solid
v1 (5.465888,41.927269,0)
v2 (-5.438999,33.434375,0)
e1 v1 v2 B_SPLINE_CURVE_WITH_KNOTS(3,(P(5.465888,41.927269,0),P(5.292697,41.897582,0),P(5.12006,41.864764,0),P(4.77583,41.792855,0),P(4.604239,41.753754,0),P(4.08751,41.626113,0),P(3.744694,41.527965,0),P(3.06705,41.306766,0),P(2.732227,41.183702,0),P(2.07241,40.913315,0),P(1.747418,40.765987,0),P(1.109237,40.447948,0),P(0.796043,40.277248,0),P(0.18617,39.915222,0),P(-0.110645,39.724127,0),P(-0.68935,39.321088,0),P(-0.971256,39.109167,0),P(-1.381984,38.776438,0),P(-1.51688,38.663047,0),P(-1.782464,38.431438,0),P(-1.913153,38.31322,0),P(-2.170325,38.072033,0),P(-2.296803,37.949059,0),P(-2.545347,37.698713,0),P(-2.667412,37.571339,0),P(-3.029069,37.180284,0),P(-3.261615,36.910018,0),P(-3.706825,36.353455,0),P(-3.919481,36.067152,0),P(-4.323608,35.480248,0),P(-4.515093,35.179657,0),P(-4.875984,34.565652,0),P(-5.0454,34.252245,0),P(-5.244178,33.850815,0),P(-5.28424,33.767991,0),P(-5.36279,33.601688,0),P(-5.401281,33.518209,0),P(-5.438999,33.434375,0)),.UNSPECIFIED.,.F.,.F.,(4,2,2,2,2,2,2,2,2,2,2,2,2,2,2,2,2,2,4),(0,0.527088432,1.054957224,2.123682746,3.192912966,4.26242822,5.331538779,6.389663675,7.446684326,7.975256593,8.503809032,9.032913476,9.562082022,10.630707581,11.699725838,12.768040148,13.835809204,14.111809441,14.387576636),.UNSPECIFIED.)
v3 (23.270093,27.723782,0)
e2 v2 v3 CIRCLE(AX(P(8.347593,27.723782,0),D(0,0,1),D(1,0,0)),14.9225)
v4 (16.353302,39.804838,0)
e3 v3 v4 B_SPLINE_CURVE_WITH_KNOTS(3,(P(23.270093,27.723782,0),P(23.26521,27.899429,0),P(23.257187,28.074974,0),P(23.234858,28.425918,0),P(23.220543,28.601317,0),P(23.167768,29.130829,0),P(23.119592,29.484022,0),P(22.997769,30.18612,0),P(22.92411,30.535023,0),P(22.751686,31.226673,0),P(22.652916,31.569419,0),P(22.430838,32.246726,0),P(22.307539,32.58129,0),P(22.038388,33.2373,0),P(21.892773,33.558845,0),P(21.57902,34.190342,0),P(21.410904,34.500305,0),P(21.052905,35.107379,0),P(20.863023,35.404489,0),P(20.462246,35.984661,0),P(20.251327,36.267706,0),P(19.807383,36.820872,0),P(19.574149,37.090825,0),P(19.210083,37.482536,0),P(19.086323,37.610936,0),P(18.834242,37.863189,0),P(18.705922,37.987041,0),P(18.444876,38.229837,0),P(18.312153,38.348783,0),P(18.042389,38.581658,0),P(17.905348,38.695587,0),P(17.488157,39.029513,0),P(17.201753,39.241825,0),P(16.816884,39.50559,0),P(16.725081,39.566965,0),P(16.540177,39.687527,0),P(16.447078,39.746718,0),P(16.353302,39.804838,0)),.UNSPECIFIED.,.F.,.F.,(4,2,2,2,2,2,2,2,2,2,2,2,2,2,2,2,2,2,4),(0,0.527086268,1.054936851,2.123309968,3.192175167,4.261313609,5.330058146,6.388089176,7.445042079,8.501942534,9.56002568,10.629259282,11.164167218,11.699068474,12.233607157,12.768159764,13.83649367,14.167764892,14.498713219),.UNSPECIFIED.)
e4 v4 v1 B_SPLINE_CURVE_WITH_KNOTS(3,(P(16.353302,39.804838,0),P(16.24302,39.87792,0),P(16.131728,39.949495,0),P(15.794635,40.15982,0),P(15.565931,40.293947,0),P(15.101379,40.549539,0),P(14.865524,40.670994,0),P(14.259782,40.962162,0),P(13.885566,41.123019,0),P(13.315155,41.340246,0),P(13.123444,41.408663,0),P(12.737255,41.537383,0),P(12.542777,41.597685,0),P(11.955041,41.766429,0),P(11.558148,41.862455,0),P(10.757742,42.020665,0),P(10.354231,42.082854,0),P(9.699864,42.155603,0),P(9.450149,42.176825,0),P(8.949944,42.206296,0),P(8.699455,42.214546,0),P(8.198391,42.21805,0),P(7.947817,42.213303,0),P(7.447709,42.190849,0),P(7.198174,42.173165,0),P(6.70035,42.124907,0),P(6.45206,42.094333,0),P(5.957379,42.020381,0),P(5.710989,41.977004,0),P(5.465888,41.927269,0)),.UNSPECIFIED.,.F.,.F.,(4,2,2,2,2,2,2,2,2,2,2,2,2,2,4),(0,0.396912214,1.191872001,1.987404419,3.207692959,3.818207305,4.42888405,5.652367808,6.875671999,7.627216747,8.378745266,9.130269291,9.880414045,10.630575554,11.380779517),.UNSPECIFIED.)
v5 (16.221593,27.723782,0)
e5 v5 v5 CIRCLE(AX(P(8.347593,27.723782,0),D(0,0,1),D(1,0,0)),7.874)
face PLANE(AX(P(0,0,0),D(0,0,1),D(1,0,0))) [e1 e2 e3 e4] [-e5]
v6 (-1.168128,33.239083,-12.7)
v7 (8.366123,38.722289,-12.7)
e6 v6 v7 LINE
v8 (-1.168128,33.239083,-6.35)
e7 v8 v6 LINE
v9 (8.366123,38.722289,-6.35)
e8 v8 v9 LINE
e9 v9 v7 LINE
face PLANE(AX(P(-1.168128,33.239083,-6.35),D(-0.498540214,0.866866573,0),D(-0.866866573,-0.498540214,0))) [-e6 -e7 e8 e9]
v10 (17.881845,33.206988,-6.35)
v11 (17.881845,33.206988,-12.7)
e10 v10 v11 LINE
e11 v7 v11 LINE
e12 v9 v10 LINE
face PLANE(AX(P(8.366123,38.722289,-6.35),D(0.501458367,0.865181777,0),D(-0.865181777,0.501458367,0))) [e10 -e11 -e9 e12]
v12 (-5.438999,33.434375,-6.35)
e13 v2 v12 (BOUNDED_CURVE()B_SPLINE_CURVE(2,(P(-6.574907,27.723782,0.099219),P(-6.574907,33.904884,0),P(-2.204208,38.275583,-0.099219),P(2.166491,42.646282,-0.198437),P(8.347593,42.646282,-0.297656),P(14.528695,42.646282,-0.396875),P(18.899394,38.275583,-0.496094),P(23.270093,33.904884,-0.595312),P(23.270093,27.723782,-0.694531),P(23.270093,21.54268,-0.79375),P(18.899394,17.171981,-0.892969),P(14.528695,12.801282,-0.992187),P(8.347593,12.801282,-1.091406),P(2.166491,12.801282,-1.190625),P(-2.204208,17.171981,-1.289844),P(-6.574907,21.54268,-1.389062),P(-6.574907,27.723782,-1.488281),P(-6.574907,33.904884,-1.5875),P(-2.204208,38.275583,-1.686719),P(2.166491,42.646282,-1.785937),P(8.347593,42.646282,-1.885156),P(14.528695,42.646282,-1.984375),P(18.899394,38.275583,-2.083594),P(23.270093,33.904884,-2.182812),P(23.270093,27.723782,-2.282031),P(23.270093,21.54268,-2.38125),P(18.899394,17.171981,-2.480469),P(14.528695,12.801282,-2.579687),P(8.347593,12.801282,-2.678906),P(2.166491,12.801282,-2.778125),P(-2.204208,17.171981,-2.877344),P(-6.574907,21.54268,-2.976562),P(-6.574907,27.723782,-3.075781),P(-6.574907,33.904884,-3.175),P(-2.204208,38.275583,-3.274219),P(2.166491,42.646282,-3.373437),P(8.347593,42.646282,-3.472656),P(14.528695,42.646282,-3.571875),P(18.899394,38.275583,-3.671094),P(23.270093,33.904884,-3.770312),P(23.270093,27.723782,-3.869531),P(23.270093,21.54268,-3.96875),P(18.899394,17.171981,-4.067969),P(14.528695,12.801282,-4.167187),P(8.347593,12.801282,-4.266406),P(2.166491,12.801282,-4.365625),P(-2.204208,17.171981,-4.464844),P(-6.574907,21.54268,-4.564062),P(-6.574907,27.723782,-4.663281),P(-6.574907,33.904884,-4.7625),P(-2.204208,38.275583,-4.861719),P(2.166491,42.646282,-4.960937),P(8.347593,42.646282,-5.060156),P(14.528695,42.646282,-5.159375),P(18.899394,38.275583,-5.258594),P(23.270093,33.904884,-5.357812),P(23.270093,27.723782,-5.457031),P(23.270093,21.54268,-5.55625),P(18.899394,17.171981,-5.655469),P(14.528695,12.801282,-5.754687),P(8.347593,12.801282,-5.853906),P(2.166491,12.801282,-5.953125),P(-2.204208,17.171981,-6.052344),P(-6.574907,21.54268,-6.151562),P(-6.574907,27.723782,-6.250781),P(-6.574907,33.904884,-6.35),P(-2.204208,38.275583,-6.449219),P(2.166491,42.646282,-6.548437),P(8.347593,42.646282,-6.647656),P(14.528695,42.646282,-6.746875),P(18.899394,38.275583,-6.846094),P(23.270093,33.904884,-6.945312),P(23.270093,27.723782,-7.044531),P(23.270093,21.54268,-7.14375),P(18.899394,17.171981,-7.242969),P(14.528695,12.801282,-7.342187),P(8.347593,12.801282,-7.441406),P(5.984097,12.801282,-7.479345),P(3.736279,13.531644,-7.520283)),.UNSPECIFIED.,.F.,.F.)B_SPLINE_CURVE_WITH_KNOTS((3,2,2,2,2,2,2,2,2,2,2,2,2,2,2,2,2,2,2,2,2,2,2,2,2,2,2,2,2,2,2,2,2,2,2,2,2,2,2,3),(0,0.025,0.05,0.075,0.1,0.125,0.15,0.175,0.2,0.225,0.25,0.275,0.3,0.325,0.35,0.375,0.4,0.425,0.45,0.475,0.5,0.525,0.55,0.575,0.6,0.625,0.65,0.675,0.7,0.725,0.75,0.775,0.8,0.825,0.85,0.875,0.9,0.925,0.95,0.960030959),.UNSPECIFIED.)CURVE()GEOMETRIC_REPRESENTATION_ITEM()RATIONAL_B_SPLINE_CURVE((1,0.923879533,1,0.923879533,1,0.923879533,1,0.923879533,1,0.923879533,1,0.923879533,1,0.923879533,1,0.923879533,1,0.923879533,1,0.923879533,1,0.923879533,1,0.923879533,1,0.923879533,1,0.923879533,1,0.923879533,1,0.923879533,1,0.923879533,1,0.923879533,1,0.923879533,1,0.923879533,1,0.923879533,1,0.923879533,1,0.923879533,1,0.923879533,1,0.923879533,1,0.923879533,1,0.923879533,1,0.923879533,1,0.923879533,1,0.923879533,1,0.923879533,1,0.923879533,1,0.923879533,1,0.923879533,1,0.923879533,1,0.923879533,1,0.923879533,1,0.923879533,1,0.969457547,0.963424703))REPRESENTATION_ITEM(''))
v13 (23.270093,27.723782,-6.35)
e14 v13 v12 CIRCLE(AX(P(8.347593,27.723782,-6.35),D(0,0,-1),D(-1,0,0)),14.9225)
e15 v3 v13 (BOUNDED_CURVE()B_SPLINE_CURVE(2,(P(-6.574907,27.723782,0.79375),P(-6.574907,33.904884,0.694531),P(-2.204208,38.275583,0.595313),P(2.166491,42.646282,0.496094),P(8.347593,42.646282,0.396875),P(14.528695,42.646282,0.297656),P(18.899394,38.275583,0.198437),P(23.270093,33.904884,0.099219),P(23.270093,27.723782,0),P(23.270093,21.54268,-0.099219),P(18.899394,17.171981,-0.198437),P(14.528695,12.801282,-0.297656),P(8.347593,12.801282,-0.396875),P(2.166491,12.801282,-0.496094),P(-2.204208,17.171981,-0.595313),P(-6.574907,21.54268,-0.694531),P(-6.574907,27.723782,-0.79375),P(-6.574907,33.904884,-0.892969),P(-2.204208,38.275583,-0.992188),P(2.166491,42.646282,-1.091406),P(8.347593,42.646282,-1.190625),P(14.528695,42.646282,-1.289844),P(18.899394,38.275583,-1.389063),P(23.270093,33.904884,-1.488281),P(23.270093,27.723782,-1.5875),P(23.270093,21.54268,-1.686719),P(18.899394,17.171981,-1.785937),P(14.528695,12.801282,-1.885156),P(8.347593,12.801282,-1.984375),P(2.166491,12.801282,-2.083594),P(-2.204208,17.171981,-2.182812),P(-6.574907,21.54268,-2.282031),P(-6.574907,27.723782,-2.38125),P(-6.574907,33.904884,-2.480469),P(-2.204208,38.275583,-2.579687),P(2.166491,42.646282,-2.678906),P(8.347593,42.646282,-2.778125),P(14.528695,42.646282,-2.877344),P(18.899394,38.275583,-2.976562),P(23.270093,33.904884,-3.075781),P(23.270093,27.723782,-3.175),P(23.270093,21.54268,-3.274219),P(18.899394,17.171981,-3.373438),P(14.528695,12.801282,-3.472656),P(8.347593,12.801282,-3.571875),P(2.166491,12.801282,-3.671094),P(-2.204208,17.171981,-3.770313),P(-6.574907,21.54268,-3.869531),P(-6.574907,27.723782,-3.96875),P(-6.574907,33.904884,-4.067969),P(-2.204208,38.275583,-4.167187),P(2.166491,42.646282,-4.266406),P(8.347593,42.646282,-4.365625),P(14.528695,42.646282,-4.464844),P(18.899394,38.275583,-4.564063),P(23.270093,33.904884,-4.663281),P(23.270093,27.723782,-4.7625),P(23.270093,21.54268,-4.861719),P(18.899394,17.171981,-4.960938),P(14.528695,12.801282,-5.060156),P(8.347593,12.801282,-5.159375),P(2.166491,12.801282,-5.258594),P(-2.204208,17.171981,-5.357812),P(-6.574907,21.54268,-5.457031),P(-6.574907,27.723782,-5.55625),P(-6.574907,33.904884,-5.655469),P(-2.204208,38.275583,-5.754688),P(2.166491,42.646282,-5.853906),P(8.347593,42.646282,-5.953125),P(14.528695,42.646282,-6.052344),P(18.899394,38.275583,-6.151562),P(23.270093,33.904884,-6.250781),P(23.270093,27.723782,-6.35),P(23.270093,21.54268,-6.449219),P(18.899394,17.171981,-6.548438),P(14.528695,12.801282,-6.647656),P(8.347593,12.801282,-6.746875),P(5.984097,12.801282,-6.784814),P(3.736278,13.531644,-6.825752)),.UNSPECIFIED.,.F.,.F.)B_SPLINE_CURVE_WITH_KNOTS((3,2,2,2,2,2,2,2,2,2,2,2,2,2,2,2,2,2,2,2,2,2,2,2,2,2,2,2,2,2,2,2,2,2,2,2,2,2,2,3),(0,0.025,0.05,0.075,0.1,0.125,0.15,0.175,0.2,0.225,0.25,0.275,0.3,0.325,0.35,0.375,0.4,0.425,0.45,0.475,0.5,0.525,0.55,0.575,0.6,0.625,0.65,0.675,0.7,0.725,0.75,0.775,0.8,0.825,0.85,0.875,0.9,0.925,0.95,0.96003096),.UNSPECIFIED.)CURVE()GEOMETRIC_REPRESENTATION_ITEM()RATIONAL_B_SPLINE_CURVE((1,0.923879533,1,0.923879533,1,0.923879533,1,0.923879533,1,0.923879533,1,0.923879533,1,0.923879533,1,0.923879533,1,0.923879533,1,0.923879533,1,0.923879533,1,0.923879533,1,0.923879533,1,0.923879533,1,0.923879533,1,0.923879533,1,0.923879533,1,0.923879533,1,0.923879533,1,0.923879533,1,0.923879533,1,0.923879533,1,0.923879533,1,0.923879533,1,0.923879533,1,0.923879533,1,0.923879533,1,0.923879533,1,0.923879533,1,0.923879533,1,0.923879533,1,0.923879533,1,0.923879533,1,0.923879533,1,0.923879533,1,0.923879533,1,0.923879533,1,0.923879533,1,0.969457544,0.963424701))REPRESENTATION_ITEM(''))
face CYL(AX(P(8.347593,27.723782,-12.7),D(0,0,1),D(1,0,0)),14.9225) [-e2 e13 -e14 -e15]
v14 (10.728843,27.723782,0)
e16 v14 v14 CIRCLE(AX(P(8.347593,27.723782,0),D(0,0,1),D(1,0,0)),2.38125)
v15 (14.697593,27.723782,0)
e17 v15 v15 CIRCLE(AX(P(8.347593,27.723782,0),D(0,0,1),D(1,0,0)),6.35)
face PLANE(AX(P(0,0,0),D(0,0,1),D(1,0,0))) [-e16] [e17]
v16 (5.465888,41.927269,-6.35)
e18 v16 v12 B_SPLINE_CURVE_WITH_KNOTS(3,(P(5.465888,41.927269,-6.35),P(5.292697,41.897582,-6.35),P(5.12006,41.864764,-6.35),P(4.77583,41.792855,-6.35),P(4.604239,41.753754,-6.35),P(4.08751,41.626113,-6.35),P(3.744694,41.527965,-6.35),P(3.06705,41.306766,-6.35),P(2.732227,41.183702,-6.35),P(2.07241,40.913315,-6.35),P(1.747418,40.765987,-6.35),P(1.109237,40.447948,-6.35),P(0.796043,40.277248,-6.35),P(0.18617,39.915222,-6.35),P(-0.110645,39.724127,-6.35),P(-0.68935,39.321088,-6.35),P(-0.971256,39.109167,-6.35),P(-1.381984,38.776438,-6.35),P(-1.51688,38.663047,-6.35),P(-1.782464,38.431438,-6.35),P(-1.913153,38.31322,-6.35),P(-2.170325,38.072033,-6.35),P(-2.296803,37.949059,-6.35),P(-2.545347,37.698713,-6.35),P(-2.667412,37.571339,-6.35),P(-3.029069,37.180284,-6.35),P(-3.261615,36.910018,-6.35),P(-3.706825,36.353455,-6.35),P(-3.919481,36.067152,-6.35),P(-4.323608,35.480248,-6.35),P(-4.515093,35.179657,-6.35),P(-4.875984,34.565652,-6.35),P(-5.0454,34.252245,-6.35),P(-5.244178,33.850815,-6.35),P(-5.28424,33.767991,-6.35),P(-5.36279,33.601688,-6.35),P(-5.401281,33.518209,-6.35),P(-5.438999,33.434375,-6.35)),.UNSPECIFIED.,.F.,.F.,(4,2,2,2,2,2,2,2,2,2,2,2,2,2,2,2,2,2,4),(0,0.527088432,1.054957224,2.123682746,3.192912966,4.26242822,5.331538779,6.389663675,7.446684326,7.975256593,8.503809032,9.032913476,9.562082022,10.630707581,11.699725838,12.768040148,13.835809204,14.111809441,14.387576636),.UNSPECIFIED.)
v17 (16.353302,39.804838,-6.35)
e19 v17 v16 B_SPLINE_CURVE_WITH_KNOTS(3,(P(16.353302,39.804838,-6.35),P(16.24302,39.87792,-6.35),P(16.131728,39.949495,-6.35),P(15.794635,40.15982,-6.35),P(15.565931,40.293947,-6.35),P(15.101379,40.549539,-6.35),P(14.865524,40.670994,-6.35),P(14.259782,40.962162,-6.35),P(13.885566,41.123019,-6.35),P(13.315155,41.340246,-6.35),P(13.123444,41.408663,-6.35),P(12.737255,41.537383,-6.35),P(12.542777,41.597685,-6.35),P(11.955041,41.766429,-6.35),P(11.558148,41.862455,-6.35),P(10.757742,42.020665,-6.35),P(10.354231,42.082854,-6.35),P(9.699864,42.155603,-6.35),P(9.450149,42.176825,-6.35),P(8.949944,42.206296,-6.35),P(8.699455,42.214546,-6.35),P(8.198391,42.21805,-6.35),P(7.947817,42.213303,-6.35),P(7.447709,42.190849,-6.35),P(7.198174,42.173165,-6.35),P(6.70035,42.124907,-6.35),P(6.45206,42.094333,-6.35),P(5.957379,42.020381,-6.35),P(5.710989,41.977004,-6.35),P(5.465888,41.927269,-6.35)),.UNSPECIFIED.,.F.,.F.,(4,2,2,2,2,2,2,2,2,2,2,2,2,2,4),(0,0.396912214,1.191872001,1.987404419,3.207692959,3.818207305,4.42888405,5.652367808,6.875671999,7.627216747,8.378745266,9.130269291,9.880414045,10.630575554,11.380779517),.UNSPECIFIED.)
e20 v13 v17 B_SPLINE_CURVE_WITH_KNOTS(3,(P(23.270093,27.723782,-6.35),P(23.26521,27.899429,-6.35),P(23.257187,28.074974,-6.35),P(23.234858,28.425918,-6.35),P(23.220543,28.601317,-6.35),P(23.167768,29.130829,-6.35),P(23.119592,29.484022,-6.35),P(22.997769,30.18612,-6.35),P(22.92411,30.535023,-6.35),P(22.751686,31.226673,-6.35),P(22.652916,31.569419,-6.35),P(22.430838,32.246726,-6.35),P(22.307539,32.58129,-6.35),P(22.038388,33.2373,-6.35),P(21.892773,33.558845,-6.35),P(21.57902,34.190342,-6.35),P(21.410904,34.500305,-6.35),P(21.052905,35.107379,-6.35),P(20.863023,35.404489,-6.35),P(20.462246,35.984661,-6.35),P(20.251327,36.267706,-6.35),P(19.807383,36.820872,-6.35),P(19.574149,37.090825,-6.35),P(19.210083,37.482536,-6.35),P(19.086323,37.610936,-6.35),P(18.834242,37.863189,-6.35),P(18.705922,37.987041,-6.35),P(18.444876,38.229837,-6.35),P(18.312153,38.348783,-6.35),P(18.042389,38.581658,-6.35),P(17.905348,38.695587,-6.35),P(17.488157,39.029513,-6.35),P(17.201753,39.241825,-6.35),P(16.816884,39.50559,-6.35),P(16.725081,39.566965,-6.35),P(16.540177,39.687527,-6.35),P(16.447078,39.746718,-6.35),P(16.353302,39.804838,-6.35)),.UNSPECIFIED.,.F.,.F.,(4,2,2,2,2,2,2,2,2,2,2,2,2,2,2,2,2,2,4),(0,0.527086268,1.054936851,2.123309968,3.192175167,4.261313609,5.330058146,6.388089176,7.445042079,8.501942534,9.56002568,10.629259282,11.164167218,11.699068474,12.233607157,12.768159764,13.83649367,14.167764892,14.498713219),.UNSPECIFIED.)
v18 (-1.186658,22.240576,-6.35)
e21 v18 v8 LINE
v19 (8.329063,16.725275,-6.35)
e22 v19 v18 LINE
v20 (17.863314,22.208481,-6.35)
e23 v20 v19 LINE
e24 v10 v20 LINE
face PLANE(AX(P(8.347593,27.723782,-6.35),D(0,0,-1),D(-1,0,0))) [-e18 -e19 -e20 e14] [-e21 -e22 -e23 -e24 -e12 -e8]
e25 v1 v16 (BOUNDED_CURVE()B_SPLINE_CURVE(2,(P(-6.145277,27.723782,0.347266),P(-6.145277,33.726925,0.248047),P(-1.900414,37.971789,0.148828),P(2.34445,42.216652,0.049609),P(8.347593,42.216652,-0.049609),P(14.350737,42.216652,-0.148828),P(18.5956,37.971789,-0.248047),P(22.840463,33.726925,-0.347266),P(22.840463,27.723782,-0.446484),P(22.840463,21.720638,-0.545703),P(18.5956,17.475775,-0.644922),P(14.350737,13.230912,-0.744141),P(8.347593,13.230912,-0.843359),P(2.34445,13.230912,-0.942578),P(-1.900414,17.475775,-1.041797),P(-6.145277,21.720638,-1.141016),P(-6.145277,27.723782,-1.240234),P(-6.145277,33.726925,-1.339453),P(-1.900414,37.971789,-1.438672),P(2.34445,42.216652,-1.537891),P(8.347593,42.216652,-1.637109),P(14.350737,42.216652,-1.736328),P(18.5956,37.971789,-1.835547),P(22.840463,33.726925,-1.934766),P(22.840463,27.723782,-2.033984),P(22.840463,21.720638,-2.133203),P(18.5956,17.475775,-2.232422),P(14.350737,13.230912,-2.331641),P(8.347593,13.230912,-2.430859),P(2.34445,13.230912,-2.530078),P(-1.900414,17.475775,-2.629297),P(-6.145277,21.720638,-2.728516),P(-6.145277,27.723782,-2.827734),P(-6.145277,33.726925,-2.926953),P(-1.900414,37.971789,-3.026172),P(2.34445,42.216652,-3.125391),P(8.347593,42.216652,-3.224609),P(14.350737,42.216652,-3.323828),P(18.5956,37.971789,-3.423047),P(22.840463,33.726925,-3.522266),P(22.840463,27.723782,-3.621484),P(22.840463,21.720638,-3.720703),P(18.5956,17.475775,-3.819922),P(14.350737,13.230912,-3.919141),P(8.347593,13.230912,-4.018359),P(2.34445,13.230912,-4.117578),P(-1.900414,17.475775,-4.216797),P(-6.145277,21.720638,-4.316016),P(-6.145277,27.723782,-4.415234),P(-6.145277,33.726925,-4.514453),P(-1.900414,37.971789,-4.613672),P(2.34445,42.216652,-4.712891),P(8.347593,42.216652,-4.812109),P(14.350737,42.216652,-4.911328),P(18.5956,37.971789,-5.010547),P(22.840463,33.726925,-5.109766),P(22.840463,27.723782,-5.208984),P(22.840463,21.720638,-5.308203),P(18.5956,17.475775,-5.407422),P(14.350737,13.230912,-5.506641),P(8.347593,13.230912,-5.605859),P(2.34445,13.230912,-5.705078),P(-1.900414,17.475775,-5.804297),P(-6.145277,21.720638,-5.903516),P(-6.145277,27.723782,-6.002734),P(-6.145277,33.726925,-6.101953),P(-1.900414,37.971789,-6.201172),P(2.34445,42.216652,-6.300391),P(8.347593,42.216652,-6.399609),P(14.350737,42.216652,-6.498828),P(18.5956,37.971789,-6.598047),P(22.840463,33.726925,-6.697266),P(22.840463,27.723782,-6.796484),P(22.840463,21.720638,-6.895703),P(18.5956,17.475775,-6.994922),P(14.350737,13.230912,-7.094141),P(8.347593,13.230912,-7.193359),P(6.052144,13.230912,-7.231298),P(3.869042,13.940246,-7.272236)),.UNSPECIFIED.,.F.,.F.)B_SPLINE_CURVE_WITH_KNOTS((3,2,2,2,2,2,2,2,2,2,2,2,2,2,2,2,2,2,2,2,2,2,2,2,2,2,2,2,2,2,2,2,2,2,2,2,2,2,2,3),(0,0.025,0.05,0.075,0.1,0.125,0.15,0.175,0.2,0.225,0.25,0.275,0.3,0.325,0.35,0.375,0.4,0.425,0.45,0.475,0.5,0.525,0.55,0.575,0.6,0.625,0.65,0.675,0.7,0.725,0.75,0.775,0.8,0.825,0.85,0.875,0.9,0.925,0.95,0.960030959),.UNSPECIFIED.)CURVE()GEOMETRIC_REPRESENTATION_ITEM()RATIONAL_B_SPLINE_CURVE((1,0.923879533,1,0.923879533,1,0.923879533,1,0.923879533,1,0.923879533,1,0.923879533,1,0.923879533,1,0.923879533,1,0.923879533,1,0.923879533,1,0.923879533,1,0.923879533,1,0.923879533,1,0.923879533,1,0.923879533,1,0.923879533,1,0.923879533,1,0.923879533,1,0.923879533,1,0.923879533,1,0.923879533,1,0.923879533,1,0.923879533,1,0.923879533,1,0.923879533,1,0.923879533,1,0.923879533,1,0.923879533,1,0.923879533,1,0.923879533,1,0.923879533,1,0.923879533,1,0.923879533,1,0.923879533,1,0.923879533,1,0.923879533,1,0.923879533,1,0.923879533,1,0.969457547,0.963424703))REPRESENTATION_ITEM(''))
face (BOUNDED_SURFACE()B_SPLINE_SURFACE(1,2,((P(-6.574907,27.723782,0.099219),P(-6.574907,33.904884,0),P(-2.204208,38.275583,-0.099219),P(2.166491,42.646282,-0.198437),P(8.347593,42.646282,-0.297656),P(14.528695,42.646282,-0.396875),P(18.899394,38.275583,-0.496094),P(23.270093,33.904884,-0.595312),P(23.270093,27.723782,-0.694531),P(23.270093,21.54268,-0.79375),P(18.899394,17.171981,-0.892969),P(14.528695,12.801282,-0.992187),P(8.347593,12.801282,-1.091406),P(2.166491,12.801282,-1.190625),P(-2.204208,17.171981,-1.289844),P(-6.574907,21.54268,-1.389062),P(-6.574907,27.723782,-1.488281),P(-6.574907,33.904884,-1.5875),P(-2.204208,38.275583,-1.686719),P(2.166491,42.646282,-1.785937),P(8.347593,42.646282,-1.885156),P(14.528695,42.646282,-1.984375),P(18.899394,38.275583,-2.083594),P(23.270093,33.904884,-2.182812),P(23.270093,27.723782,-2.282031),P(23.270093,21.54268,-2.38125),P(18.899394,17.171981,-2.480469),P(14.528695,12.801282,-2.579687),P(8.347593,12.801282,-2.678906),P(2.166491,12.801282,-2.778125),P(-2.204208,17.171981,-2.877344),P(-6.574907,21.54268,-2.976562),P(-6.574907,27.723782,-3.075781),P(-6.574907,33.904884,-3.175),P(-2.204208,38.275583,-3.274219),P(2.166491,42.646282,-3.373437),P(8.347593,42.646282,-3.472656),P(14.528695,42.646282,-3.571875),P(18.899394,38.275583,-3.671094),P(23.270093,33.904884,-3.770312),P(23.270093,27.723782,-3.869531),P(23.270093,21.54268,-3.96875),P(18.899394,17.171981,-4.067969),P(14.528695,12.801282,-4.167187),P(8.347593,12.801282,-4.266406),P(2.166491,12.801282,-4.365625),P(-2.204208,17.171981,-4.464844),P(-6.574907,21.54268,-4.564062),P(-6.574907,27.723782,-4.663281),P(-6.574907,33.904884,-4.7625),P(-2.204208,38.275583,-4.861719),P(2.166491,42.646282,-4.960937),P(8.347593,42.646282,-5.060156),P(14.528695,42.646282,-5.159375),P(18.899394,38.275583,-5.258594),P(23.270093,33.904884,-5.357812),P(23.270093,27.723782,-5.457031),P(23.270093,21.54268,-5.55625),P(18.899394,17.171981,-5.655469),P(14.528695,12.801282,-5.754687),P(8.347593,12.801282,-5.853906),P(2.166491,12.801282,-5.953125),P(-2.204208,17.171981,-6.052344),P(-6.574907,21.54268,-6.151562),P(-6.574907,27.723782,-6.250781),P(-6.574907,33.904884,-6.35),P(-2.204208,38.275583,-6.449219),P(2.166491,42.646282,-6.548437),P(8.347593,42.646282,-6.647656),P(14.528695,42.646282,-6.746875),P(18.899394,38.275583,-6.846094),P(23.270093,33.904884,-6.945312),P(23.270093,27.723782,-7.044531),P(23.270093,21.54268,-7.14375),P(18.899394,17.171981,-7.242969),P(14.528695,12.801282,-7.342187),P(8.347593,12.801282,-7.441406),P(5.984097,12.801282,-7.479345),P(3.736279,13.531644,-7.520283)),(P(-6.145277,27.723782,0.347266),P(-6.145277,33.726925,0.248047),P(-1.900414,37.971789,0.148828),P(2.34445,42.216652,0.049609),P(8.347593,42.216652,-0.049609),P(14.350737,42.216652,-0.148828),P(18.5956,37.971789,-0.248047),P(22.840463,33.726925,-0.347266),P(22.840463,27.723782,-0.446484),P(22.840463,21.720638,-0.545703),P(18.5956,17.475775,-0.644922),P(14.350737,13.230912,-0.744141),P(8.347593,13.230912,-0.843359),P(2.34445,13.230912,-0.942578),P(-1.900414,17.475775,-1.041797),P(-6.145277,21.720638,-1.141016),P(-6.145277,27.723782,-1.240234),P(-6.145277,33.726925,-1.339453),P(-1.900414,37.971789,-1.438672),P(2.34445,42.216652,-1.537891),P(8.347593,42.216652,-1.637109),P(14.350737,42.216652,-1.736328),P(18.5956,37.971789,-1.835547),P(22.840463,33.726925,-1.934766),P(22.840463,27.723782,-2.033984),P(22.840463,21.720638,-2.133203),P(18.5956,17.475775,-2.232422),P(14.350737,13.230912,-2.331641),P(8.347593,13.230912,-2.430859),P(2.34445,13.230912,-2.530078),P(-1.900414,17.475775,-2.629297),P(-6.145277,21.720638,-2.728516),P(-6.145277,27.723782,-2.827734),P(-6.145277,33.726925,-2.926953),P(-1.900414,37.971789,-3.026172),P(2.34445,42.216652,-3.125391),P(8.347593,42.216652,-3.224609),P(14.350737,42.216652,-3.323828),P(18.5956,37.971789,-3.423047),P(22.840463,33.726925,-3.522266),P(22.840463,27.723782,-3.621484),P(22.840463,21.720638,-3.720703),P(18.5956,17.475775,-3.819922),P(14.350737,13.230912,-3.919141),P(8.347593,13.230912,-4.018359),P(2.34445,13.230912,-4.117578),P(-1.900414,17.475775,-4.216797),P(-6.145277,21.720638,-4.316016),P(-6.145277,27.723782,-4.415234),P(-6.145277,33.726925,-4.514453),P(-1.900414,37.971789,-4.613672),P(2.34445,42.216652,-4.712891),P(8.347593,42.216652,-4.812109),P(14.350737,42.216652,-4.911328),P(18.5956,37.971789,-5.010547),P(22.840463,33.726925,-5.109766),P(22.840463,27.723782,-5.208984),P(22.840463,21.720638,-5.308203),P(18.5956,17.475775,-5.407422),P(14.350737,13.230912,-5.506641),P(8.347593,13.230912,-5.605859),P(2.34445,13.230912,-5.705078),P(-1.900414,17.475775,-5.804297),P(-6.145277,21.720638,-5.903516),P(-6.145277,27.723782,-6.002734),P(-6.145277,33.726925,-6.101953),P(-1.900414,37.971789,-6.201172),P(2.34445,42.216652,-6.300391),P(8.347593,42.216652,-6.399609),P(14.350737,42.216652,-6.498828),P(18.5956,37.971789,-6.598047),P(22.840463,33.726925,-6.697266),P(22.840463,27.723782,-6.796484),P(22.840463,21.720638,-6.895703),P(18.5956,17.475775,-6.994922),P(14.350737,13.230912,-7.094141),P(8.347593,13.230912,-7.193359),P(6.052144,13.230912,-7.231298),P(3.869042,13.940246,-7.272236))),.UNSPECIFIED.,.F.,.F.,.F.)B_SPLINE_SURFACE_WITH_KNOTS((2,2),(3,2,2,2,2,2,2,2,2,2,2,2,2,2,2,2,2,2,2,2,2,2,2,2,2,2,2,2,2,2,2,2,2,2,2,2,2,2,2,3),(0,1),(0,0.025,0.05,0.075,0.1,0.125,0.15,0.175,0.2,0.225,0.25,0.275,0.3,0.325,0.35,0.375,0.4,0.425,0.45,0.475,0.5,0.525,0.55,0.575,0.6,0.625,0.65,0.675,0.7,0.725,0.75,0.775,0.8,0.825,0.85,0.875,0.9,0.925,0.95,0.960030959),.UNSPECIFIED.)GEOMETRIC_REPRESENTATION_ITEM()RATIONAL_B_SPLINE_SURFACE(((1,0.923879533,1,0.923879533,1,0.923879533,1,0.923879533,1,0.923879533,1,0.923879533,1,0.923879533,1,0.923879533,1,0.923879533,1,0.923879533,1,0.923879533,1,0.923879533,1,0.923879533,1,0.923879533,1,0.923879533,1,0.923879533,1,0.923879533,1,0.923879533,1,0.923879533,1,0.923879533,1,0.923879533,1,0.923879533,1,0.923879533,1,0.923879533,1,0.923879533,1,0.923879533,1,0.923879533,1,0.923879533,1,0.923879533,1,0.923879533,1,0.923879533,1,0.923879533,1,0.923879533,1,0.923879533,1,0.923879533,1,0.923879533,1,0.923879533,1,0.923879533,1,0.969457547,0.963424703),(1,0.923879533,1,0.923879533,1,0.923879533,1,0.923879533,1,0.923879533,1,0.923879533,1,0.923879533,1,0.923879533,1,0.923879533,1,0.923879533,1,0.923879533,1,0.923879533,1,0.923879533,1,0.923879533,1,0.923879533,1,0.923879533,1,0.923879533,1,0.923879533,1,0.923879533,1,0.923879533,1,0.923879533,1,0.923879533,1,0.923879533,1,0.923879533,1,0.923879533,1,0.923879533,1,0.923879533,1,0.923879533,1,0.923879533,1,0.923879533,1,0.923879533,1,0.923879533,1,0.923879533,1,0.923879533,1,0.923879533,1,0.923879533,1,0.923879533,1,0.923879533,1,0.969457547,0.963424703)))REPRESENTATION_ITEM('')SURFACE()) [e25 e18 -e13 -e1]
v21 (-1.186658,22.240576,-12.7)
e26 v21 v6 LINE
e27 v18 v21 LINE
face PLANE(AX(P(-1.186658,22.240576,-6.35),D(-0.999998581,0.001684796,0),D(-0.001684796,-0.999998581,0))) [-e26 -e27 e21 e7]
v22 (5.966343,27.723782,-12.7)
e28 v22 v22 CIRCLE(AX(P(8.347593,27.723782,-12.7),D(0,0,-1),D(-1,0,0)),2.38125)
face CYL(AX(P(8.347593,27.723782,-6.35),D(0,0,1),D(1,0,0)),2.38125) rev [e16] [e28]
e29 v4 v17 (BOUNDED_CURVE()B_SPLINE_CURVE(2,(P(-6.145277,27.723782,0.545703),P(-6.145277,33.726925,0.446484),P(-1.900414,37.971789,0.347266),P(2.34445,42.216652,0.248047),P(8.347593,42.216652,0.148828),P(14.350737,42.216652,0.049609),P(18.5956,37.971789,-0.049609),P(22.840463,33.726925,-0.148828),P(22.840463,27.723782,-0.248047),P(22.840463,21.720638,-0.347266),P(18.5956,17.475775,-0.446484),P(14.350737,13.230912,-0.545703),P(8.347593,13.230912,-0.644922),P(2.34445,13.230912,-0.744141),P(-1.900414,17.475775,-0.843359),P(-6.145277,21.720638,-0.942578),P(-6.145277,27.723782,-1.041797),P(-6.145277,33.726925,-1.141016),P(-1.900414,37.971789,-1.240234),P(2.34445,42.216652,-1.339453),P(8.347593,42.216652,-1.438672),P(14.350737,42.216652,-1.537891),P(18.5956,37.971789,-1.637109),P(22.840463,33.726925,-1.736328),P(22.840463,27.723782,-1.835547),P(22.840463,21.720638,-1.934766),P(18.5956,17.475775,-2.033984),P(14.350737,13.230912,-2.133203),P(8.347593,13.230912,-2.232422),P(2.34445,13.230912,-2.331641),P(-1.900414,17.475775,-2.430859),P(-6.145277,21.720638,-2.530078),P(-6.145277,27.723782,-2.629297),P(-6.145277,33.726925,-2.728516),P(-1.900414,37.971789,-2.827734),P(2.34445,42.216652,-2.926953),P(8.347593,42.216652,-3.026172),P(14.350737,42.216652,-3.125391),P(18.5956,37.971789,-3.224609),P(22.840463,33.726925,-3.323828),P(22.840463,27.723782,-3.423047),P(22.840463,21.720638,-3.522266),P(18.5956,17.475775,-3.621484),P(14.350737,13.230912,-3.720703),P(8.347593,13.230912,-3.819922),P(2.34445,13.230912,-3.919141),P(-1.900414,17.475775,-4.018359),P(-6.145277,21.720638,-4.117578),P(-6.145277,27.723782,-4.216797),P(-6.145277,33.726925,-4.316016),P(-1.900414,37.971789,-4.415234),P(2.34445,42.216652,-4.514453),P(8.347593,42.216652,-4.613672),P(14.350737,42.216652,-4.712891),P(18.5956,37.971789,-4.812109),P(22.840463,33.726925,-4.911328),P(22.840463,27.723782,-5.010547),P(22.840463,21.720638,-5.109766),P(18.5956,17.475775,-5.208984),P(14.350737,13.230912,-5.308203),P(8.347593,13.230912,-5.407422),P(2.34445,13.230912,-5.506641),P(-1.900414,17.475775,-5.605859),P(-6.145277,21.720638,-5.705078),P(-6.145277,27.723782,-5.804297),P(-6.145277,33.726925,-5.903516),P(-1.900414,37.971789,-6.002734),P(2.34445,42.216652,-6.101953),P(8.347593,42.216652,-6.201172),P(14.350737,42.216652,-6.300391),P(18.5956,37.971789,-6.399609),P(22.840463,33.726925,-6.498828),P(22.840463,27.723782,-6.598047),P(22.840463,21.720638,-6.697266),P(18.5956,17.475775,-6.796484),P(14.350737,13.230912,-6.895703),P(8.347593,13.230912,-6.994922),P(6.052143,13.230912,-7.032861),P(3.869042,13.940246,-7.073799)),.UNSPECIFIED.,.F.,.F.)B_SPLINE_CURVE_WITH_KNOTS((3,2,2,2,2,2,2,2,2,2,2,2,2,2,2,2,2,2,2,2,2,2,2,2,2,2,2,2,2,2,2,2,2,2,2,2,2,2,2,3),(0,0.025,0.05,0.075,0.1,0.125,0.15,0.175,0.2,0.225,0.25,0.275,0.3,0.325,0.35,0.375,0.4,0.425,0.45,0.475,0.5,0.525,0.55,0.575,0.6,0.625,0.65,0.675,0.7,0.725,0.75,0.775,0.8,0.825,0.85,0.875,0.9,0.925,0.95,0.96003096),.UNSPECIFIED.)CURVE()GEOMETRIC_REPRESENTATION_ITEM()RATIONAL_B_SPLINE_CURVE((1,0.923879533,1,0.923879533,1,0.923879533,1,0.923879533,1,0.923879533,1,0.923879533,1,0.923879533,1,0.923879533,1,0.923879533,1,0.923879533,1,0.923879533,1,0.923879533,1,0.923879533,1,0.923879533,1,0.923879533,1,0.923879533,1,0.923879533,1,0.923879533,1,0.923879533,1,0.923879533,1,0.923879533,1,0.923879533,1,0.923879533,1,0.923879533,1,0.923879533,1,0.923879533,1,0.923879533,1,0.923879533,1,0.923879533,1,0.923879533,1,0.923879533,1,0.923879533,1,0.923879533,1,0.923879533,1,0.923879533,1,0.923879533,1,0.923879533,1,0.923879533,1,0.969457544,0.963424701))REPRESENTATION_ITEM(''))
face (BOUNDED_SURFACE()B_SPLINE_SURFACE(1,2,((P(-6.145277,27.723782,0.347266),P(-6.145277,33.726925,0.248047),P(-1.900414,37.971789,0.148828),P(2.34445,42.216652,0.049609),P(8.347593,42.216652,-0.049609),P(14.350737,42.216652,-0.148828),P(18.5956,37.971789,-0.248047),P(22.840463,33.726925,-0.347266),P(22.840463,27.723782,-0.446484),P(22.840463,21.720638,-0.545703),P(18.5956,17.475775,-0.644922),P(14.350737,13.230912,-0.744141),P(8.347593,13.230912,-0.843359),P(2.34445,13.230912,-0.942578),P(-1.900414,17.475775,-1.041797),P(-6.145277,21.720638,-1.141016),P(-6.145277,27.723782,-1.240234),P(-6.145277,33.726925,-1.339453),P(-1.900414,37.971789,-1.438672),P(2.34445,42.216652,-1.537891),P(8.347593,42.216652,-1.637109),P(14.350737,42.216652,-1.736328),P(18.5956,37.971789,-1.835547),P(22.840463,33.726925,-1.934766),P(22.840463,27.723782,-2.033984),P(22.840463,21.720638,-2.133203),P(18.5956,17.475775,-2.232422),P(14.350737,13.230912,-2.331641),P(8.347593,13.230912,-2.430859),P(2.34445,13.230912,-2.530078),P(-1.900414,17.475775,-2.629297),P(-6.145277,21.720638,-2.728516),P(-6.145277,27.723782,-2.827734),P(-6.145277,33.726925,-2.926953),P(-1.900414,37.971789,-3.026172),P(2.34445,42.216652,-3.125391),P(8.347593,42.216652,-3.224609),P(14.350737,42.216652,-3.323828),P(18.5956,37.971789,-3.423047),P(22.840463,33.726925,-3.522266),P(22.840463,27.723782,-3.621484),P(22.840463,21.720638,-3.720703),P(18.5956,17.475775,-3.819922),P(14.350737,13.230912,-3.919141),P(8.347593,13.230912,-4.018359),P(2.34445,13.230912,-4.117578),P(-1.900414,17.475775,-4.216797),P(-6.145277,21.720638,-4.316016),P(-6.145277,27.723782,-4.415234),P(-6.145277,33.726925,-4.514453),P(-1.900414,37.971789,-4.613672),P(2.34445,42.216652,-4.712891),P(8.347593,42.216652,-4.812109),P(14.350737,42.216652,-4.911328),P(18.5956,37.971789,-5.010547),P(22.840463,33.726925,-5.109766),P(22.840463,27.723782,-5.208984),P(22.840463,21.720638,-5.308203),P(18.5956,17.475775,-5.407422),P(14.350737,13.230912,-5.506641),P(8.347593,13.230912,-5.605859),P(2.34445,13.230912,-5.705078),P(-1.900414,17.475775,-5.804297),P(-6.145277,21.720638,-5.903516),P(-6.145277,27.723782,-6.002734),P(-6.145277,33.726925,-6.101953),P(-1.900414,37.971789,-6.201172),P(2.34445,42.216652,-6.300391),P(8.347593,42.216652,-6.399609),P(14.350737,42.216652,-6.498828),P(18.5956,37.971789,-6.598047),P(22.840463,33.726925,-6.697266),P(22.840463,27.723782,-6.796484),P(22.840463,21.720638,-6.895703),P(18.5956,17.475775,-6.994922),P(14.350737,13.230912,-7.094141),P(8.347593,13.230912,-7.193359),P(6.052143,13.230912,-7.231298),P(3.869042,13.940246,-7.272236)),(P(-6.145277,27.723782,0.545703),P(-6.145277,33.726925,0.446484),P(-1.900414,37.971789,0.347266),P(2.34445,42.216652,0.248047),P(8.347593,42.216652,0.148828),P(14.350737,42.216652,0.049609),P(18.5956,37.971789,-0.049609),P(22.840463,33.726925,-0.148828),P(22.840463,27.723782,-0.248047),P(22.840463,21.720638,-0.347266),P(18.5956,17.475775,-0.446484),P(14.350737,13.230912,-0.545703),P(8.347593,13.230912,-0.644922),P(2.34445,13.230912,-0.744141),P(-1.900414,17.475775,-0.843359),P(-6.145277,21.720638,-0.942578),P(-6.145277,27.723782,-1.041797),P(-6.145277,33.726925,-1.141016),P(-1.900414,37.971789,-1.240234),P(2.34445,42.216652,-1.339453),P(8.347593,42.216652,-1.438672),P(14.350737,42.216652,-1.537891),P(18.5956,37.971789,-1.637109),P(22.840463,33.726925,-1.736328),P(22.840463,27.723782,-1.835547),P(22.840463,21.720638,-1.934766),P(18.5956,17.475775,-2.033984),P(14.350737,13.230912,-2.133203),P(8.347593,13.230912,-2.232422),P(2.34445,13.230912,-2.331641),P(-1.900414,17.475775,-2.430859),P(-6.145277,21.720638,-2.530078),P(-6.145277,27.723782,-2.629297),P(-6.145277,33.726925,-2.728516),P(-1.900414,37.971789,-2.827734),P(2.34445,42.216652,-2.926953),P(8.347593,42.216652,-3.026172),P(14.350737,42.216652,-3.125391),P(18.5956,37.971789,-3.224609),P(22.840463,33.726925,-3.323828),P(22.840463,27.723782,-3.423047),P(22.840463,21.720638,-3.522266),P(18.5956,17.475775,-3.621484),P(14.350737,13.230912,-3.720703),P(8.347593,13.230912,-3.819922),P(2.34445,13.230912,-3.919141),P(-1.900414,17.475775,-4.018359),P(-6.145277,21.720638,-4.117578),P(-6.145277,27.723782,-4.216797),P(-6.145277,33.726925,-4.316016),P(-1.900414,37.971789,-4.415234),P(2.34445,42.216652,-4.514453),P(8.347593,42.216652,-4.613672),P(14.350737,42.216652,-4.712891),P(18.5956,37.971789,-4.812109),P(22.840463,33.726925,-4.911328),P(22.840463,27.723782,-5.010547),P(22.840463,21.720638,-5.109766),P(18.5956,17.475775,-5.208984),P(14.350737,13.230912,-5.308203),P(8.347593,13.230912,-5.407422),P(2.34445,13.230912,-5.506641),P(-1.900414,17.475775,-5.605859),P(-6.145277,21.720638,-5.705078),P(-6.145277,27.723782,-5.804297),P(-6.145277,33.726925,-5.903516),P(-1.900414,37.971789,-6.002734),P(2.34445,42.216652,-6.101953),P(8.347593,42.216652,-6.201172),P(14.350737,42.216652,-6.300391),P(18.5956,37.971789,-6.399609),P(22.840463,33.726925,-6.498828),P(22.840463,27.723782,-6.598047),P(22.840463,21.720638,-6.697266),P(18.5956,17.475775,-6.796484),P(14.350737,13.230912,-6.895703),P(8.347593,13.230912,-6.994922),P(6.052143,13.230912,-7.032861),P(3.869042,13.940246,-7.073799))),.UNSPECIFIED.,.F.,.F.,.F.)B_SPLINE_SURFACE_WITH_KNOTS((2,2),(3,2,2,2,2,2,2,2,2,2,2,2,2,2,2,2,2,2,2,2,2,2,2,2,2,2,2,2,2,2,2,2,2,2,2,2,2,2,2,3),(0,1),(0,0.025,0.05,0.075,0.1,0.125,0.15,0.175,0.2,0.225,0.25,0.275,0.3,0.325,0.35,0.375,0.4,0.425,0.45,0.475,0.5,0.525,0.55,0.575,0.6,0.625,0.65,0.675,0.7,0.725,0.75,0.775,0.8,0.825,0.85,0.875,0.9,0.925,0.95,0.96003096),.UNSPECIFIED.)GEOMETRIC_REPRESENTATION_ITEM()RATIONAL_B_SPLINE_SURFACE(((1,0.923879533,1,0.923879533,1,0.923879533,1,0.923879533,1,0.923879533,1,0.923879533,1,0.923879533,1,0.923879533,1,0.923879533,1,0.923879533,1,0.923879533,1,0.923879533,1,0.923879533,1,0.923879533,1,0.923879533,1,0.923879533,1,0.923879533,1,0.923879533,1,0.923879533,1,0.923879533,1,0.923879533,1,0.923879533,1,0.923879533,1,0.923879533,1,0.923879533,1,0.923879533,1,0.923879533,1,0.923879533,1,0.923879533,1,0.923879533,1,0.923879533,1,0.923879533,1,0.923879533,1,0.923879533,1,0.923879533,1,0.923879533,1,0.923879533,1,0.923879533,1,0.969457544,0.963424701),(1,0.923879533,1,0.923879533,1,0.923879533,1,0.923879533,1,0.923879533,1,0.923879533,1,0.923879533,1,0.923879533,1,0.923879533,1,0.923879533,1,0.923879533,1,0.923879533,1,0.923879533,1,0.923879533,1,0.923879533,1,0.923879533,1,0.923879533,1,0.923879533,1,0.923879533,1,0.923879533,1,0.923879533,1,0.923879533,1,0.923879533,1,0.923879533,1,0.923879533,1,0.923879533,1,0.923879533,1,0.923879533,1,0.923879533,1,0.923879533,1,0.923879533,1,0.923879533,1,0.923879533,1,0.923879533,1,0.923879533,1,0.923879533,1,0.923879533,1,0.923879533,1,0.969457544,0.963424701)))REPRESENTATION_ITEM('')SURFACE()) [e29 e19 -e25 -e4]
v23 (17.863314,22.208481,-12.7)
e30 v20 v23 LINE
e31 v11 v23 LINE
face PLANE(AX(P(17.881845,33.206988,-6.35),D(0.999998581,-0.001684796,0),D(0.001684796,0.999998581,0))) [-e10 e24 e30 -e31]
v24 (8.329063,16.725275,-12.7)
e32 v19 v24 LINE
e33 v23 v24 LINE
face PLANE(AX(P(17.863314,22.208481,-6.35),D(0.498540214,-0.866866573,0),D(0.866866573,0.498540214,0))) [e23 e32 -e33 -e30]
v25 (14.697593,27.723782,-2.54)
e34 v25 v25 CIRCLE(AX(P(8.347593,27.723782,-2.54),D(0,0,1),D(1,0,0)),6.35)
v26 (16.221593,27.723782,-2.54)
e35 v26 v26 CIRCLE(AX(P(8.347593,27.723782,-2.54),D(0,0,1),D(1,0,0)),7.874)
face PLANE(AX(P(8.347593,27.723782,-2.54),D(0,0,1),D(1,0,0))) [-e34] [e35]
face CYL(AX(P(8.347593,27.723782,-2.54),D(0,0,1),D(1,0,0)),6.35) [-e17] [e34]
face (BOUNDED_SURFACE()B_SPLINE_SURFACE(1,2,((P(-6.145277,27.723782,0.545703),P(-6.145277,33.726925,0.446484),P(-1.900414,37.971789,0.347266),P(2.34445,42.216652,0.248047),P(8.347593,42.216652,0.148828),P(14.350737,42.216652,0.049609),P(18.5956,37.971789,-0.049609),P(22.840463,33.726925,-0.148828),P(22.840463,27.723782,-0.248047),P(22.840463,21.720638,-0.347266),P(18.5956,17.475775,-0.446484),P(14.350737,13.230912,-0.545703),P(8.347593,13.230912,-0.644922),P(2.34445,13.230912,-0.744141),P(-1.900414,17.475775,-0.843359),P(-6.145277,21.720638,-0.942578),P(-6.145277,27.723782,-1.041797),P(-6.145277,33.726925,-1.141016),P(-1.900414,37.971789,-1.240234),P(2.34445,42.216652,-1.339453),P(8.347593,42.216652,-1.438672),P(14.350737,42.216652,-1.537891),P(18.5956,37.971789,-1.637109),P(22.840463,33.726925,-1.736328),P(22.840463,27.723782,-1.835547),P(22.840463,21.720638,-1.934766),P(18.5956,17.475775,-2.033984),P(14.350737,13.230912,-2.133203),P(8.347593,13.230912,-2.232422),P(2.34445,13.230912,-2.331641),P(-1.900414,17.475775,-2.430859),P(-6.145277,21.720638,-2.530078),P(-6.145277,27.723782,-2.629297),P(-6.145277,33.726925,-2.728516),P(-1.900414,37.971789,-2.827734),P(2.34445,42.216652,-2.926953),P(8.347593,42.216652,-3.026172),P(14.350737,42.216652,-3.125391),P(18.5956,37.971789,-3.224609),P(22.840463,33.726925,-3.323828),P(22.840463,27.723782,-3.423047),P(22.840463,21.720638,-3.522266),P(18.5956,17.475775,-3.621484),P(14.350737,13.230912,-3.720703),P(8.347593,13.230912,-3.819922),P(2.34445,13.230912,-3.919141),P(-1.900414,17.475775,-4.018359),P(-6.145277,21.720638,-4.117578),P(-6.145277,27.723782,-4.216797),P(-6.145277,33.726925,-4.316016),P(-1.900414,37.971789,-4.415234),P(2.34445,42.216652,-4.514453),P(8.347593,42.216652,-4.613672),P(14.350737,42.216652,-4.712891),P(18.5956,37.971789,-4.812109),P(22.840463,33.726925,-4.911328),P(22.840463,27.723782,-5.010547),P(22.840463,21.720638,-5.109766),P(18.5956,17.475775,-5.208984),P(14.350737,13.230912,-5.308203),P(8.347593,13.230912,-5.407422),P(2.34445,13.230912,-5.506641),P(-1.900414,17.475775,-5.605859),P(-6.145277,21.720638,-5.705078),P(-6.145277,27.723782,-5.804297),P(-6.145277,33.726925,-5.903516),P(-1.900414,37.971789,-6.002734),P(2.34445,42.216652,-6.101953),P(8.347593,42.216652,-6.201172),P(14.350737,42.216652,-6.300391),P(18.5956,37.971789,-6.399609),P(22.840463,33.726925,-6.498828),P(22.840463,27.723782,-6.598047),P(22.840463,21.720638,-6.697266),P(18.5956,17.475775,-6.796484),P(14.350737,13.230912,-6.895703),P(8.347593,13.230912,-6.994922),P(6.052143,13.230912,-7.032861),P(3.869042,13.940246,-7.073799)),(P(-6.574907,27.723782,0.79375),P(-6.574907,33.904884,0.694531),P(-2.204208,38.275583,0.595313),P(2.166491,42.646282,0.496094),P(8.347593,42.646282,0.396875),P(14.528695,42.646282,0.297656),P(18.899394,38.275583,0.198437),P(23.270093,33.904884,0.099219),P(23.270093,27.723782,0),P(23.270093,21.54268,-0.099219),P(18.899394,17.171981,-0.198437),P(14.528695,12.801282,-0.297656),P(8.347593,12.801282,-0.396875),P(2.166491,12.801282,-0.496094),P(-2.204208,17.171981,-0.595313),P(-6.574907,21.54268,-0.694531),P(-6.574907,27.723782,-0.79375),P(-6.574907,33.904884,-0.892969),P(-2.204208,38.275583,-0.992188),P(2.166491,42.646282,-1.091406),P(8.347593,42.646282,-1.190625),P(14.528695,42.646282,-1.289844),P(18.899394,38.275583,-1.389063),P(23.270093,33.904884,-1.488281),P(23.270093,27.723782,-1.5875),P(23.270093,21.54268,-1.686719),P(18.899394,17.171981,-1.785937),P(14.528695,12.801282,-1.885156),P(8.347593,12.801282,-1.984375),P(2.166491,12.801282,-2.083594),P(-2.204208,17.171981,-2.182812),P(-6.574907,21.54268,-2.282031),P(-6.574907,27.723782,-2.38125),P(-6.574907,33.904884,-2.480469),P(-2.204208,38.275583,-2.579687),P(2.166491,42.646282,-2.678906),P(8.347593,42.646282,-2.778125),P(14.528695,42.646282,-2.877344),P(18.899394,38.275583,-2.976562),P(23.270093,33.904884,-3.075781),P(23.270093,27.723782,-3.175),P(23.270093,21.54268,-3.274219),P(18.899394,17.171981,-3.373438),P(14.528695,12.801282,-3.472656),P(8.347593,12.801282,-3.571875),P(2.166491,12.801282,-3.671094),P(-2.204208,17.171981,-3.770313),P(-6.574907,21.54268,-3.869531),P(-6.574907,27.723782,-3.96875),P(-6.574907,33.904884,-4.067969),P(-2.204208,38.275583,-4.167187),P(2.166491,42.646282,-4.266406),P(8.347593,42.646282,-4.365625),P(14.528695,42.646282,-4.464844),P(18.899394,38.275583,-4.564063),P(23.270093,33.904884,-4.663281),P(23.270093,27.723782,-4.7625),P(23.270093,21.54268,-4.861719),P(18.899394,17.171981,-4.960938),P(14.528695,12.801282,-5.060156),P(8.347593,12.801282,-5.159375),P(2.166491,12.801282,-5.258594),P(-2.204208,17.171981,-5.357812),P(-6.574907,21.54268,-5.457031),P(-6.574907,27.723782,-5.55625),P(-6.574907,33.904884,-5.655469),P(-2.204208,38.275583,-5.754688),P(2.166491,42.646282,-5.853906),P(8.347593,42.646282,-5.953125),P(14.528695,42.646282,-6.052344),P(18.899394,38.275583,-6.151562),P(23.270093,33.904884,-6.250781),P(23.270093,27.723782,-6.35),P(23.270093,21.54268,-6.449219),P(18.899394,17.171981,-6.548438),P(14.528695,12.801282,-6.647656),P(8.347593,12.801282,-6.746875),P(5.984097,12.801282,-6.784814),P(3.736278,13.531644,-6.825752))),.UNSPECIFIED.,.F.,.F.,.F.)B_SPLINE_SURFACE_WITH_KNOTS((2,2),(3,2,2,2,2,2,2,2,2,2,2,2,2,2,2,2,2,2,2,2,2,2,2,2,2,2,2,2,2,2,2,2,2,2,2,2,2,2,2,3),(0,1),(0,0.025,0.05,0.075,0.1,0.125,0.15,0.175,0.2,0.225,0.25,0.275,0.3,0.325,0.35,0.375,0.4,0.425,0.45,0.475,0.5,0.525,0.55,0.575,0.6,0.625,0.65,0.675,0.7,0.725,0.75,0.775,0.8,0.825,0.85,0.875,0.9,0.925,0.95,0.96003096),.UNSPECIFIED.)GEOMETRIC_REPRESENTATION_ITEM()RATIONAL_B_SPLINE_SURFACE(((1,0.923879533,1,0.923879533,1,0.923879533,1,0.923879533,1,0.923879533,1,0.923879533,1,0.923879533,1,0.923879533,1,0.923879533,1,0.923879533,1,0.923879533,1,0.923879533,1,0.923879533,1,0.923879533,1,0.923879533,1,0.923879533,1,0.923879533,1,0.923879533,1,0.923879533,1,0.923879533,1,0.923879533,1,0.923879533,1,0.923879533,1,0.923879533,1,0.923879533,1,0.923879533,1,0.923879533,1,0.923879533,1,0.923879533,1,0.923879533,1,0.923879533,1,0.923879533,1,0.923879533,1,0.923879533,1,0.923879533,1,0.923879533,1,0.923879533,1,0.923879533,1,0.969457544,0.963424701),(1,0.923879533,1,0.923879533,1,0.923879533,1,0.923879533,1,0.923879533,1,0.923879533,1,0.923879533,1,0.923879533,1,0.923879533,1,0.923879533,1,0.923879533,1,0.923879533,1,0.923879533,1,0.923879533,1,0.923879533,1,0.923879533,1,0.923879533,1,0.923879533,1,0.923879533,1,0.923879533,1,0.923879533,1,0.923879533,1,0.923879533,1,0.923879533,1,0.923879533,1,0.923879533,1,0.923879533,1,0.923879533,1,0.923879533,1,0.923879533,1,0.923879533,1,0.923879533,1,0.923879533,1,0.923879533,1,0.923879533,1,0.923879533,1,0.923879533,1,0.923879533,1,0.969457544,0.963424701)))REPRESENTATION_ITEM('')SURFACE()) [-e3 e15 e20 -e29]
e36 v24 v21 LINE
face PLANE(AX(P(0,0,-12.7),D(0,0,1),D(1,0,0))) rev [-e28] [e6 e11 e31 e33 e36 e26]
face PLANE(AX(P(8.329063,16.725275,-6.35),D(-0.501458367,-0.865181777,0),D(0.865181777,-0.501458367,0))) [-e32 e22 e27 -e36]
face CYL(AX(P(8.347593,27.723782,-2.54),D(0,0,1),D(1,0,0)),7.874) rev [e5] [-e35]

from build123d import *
from build123d.topology import SkipClean

# Parameters (mm, degrees)
SKETCH3_R           = 14.9225
BOSS_EXTRUDE1_DEPTH = 12.7
SKETCH11_R          = 2.38125
CUT_EXTRUDE3_DEPTH  = 6.35
SKETCH12_R          = 7.874
SKETCH12_R_2        = 6.35
CUT_EXTRUDE4_DEPTH  = 2.54
THREAD1_PITCH       = 1.5875
CUT_EXTRUDE5_START  = -6.35
SKETCH13_R          = 2.38125
CUT_EXTRUDE5_DEPTH  = 6.35
CUT_EXTRUDE6_START  = -6.35
SKETCH14_R          = 14.9225
CUT_EXTRUDE6_DEPTH  = 6.35


with BuildPart() as part:
    # Sketch3 → Boss-Extrude1 (new body)
    with BuildSketch(Plane.XY):
        with Locations((8.347593151, 27.723781851)):
            Circle(SKETCH3_R)
    extrude(amount=-BOSS_EXTRUDE1_DEPTH)

    # Sketch11 → Cut-Extrude3 (cut)
    with BuildSketch(Plane.XY):
        with Locations((8.347593151, 27.723781851)):
            Circle(SKETCH11_R)
    extrude(amount=-CUT_EXTRUDE3_DEPTH, mode=Mode.SUBTRACT)

    # Sketch12 → Cut-Extrude4 (cut)
    with BuildSketch(Plane.XY):
        with Locations((8.347593151, 27.723781851)):
            Circle(SKETCH12_R)
        with Locations((8.347593151, 27.723781851)):
            Circle(SKETCH12_R_2, mode=Mode.SUBTRACT)
    extrude(amount=-CUT_EXTRUDE4_DEPTH, mode=Mode.SUBTRACT)

    # Thread1: the profile of Thread Profile1 profile screwed along a right-hand helix of 4.8 turns, 8 arcs to a turn; built about Z, then put on its axis
    thread1_z = Axis((0, 0, 0), (0, 0, 1))
    thread1_corners = [(14.9228, 0, -0.000173205), (14.9228, 0, 0.694704453), (14.492870212, 0, 0.446484374), (14.492870212, 0, 0.248046874)]
    with BuildLine(mode=Mode.PRIVATE) as thread1_profile:
        Line(thread1_corners[0], thread1_corners[1])
        Line(thread1_corners[1], thread1_corners[2])
        Line(thread1_corners[2], thread1_corners[3])
        Line(thread1_corners[3], thread1_corners[0])
    thread1_cap = Face(thread1_profile.wire())
    thread1_turn_angles = [0, 22.5, 45, 67.5, 90, 112.5, 135, 157.5, 180, 202.5, 225, 247.5, 270, 292.5, 315, 337.5, 360]
    thread1_turn_weights = [1, 0.9238795325112867, 1, 0.9238795325112867, 1, 0.9238795325112867, 1, 0.9238795325112867, 1, 0.9238795325112867, 1, 0.9238795325112867, 1, 0.9238795325112867, 1, 0.9238795325112867, 1]
    thread1_turn_rails = [Edge.make_bspline([Vector(p[0], p[1], 0).rotate(thread1_z, thread1_turn_angles[k]) / thread1_turn_weights[k] + Vector(0, 0, p[2] + THREAD1_PITCH * thread1_turn_angles[k] / 360) for k in range(17)], [0, 0, 0, 1, 1, 2, 2, 3, 3, 4, 4, 5, 5, 6, 6, 7, 7, 8, 8, 8], 2, thread1_turn_weights) for p in thread1_corners]
    thread1_turn_sides = [Face.make_surface_from_curves(thread1_turn_rails[p[0]], thread1_turn_rails[p[1]]) for p in [(0, 1), (1, 2), (2, 3), (3, 0)]]
    thread1_last_angles = [1440, 1462.5, 1485, 1507.5, 1530, 1552.5, 1575, 1597.5, 1620, 1642.5, 1665, 1687.5, 1710, 1719, 1728]
    thread1_last_weights = [1, 0.9238795325112867, 1, 0.9238795325112867, 1, 0.9238795325112867, 1, 0.9238795325112867, 1, 0.9238795325112867, 1, 0.9238795325112867, 1, 0.9876883405951378, 1]
    thread1_last_rails = [Edge.make_bspline([Vector(p[0], p[1], 0).rotate(thread1_z, thread1_last_angles[k]) / thread1_last_weights[k] + Vector(0, 0, p[2] + THREAD1_PITCH * thread1_last_angles[k] / 360) for k in range(15)], [0, 0, 0, 1, 1, 2, 2, 3, 3, 4, 4, 5, 5, 6, 6, 7, 7, 7], 2, thread1_last_weights) for p in thread1_corners]
    thread1_last_sides = [Face.make_surface_from_curves(thread1_last_rails[p[0]], thread1_last_rails[p[1]]) for p in [(0, 1), (1, 2), (2, 3), (3, 0)]]
    thread1 = Plane(origin=(8.347593151, 27.723781851, 0.79375), x_dir=(-1, 0, 0), z_dir=(0, 0, -1)) * Solid(Shell([*[p.moved(Location((0, 0, THREAD1_PITCH * i))) for i in range(4) for p in thread1_turn_sides], *thread1_last_sides, thread1_cap, thread1_cap.rotate(thread1_z, 1728).moved(Location((0, 0, THREAD1_PITCH * 1728 / 360)))]))
    add(thread1, mode=Mode.SUBTRACT)

    # Sketch13 → Cut-Extrude5 (cut)
    with BuildSketch(Plane(origin=(0, 0, -12.7), x_dir=(-1, 0, 0), z_dir=(0, 0, -1)).offset(CUT_EXTRUDE5_START)):
        with Locations(Location((-8.347593151, 27.723781851, 0), (0, 0, 180))):
            Circle(SKETCH13_R)
    extrude(amount=CUT_EXTRUDE5_DEPTH, mode=Mode.SUBTRACT)

    # Sketch14 → Cut-Extrude6 (cut)
    with SkipClean():  # the faces are left unmerged after this step: merging them gives an invalid solid
        with BuildSketch(Plane(origin=(0, 0, -12.7), x_dir=(-1, 0, 0), z_dir=(0, 0, -1)).offset(CUT_EXTRUDE6_START)):
            with Locations((-8.347593151, 27.723781851)):
                Circle(SKETCH14_R)
            Polygon((1.186658464, 22.240576024), (1.168128197, 33.239083042), (-8.366123418, 38.722288869), (-17.881844766, 33.206987678), (-17.863314499, 22.20848066), (-8.329062884, 16.725274833), align=None, mode=Mode.SUBTRACT)
        extrude(amount=CUT_EXTRUDE6_DEPTH, mode=Mode.SUBTRACT)
    add(part.part.scale(1), mode=Mode.REPLACE)  # the faces are merged on a copy


solid = part.part
